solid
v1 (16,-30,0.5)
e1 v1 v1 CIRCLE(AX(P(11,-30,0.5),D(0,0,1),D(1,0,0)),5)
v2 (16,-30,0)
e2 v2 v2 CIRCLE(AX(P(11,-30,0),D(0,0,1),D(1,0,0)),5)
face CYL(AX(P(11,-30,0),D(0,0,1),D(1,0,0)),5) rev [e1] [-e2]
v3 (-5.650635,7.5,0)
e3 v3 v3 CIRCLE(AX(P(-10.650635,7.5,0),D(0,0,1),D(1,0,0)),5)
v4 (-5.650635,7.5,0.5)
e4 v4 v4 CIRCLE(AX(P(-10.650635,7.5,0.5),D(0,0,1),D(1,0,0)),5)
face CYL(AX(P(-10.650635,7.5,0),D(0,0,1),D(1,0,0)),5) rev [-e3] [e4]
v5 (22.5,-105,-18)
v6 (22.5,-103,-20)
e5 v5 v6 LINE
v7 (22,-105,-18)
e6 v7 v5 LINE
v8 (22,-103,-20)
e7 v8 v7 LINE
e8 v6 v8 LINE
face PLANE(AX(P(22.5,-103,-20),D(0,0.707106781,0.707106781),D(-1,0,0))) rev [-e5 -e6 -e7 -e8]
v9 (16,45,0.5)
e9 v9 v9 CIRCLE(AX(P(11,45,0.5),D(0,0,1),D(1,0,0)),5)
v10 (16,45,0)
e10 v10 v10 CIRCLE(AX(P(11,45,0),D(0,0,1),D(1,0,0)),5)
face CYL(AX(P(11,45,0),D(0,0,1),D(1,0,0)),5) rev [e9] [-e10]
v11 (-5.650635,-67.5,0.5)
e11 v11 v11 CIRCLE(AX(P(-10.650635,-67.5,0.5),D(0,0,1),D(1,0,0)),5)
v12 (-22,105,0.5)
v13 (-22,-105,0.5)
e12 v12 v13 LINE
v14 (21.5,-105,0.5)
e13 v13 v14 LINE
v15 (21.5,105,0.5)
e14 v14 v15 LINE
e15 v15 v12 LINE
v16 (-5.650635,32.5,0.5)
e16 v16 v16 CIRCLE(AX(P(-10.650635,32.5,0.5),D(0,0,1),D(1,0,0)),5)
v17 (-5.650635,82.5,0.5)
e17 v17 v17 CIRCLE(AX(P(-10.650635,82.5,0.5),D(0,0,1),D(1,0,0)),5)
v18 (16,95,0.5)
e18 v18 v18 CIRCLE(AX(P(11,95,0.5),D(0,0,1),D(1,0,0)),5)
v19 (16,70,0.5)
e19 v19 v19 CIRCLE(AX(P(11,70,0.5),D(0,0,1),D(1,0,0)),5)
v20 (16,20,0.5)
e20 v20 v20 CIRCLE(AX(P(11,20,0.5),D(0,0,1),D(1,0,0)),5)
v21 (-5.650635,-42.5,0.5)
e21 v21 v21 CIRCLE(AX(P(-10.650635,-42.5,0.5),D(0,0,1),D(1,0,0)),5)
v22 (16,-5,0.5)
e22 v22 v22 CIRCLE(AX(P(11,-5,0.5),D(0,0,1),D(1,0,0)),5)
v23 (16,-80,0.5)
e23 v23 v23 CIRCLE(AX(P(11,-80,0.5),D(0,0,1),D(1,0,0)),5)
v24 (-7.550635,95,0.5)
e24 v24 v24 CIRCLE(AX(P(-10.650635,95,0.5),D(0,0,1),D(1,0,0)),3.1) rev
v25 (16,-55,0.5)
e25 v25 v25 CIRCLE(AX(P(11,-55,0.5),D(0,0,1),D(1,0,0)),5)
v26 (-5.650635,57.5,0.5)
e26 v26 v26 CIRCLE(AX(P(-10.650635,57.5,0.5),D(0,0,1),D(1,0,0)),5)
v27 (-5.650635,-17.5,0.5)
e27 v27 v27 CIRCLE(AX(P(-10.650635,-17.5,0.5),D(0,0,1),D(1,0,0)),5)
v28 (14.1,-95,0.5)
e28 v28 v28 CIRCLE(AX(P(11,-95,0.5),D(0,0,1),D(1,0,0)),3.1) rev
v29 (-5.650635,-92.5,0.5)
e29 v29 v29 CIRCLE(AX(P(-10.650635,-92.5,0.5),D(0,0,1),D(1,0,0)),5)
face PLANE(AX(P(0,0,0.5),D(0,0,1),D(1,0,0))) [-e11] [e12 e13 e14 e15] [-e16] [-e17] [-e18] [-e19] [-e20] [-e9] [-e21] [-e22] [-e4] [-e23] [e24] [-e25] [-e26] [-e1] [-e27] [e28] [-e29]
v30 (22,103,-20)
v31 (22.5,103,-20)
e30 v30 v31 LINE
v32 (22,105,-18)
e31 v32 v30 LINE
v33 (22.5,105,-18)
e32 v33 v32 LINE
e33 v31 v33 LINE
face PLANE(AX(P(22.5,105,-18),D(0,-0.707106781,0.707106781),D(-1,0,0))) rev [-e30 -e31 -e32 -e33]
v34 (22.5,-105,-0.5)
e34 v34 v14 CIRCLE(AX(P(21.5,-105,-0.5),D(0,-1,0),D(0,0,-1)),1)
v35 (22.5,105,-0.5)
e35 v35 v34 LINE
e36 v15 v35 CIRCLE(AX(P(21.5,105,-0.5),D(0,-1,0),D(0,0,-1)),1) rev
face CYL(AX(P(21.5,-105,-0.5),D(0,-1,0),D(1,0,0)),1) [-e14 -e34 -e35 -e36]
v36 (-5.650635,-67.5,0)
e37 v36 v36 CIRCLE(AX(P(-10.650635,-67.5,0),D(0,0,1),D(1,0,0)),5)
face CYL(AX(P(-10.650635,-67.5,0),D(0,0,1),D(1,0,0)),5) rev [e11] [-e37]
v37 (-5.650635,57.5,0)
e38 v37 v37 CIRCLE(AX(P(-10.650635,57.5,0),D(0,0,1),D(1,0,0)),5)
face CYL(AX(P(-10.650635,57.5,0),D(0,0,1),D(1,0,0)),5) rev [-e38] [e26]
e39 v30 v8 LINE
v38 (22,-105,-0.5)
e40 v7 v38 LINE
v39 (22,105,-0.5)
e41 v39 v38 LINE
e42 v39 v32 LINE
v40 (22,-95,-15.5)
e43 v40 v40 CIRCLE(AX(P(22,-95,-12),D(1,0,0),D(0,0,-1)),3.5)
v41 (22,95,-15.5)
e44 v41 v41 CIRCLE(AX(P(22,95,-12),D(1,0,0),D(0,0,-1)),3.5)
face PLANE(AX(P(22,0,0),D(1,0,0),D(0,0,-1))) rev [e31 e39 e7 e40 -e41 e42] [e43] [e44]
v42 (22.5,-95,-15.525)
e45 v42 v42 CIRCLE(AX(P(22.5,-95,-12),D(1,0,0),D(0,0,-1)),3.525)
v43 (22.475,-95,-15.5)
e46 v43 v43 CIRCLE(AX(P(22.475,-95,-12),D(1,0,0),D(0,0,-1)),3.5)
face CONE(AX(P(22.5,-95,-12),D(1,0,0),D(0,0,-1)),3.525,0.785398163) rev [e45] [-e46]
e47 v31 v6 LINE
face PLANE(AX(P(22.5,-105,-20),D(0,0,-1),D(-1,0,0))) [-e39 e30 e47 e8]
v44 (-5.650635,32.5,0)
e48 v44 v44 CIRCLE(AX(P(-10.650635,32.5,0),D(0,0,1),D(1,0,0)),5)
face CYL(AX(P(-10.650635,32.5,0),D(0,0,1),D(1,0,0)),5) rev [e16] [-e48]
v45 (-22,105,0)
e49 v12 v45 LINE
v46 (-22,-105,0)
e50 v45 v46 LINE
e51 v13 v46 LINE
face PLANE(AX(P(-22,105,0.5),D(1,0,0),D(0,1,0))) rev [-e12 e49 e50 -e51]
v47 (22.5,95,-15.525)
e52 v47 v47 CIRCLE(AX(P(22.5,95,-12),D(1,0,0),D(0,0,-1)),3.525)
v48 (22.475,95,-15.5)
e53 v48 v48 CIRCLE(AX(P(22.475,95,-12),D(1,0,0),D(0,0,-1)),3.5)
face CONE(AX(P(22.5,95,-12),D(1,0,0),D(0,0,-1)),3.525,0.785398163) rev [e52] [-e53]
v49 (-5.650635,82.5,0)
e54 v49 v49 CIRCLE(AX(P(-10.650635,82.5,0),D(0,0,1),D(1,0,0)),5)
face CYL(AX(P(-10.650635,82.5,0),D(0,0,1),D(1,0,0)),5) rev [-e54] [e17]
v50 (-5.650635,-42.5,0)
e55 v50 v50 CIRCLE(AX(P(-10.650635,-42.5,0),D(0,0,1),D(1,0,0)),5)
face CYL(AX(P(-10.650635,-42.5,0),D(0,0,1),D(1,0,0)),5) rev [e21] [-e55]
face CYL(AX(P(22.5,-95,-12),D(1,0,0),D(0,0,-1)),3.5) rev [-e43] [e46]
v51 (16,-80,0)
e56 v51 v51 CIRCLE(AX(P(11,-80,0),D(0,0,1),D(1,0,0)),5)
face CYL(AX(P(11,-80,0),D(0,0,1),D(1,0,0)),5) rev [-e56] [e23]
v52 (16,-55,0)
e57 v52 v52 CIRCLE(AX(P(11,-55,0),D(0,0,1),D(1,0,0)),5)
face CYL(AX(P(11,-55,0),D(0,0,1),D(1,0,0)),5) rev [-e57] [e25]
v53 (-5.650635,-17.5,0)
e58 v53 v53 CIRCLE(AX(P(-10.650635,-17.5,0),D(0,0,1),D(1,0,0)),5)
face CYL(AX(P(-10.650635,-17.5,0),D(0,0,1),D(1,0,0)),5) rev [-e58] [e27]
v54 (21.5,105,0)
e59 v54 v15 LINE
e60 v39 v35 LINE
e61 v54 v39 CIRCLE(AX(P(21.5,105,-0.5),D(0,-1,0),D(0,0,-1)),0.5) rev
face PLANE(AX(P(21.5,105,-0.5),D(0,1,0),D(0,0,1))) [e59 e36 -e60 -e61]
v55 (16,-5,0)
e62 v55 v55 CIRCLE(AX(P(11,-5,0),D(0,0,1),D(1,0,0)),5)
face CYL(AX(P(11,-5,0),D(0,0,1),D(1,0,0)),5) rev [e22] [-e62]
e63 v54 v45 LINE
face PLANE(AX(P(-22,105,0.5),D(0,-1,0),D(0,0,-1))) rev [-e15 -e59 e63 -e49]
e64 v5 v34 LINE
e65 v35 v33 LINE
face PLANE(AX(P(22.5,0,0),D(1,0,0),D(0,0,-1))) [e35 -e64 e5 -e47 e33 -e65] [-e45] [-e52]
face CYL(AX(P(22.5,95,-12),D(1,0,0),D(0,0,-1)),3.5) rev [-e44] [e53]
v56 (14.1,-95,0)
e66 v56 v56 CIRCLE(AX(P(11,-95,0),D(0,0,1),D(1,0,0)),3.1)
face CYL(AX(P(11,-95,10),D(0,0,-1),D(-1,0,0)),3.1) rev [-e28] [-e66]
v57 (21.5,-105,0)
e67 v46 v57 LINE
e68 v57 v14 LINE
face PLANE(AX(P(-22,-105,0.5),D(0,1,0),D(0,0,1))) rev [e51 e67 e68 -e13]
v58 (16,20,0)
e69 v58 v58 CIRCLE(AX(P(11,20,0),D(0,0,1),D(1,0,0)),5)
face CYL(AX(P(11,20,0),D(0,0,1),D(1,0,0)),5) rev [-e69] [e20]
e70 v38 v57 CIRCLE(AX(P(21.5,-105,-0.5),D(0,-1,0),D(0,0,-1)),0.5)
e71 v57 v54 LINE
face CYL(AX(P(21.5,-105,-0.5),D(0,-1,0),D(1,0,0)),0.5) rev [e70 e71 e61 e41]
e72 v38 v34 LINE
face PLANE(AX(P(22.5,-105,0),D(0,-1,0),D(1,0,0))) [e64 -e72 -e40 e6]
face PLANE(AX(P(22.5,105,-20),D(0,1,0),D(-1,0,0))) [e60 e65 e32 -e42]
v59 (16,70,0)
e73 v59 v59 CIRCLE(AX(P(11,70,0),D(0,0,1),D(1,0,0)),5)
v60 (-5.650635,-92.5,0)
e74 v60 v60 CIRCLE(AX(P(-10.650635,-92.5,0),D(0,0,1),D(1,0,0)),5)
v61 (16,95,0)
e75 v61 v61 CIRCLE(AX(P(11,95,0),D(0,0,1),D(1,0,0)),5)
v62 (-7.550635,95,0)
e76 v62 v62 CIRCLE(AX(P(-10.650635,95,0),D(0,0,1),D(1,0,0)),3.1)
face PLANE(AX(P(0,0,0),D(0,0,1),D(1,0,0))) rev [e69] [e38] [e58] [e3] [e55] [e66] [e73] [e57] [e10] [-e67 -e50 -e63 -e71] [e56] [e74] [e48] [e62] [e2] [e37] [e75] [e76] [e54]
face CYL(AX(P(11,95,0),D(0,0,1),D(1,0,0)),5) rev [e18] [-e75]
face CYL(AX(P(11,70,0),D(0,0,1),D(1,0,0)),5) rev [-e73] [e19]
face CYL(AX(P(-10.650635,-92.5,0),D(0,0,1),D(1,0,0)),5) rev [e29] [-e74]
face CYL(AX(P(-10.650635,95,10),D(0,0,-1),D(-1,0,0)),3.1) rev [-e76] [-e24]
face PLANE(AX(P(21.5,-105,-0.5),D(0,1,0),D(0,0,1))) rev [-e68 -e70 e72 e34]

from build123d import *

# Parameters (mm, degrees)
SKETCH2_W                          = 44
SKETCH2_H                          = 210
BOSS_EXTRUDE1_DEPTH                = 0.5
SKETCH3_R                          = 5
CUT_EXTRUDE1_DEPTH                 = 108.281172626
LPATTERN1_COUNT                    = 8
LPATTERN1_PITCH                    = 25
EDGE_FLANGE1_STRIP_W               = 3
EDGE_FLANGE1_STRIP_H               = 0.5
EDGE_FLANGE1_STRIP_CUT_DEPTH       = 210
EDGE_FLANGE1_DEPTH                 = 210
F_7_0_7_DIAMETER_HOLE1_D           = 7
F_7_0_7_DIAMETER_HOLE1_DEPTH       = 60
F_7_0_7_DIAMETER_HOLE1_CSINK_D     = 7.05
F_7_0_7_DIAMETER_HOLE1_CSINK_ANGLE = 90
F_7_0_7_DIAMETER_HOLE1_TIP         = 2.103012167
BREAK_CORNER1_START                = 86.974134086
BREAK_CORNER1_OUTLINE_W            = 3
BREAK_CORNER1_OUTLINE_H            = 149.974134086
BREAK_CORNER1_DEPTH                = 1.414213562
BREAK_CORNER1_START_2              = -61.518289963
BREAK_CORNER1_2_OUTLINE_W          = 3
BREAK_CORNER1_2_OUTLINE_H          = 2.025865914
BREAK_CORNER1_2_DEPTH              = 2.828427125
SKETCH17_R                         = 3.1
CUT_EXTRUDE2_DEPTH                 = 10


# Read off the part's stored shape, not the designer's step: Break-Corner1
# Sheet-metal steps are written as plain solids
with BuildPart() as part:
    # Sketch2 → Boss-Extrude1 (new body)
    with BuildSketch(Plane.XY):
        Rectangle(SKETCH2_W, SKETCH2_H)
    extrude(amount=BOSS_EXTRUDE1_DEPTH)

    # Sketch3 → Cut-Extrude1 (cut, through all)
    with BuildSketch(Plane.XY.offset(0.5)):
        with Locations((11, 95)):
            Circle(SKETCH3_R)
        with Locations((-10.650635095, 82.5)):
            Circle(SKETCH3_R)
    cut_extrude1 = extrude(amount=-CUT_EXTRUDE1_DEPTH, mode=Mode.SUBTRACT)

    # LPattern1: Cut-Extrude1 ×8
    with Locations(*[(0, -i * LPATTERN1_PITCH, 0) for i in range(1, LPATTERN1_COUNT)]):
        add(cut_extrude1, mode=Mode.SUBTRACT)

    # Edge-Flange1 strip (across the edge) → Edge-Flange1 strip cut (cut)
    with BuildSketch(Plane(origin=(22, 105, 0), x_dir=(-1, 0, 0), z_dir=(0, -1, 0))):
        with Locations((-1, -0.25)):
            Rectangle(EDGE_FLANGE1_STRIP_W, EDGE_FLANGE1_STRIP_H)
    extrude(amount=EDGE_FLANGE1_STRIP_CUT_DEPTH, mode=Mode.SUBTRACT)

    # Edge-Flange1 section (across the edge) → Edge-Flange1 (add)
    with BuildSketch(Plane(origin=(22, 105, 0), x_dir=(-1, 0, 0), z_dir=(0, -1, 0))):
        with BuildLine():
            Line((-0.5, 0.5), (-0.5, 20))
            Line((-0.5, 20), (0, 20))
            Line((0, 20), (0, 0.5))
            ThreePointArc((0, 0.5), (0.146446609, 0.146446609), (0.5, 0))
            Line((0.5, 0), (0.5, -0.5))
            ThreePointArc((0.5, -0.5), (-0.207106781, -0.207106781), (-0.5, 0.5))
        make_face()
    extrude(amount=EDGE_FLANGE1_DEPTH)

    # Ø7.0 (7) Diameter Hole1
    with Locations(Plane(origin=(22.5, 0, 0), x_dir=(0, 0, -1), z_dir=(1, 0, 0))):
        with Locations((12, 95), (12, -95)):
            CounterSinkHole(F_7_0_7_DIAMETER_HOLE1_D / 2, F_7_0_7_DIAMETER_HOLE1_CSINK_D / 2, depth=F_7_0_7_DIAMETER_HOLE1_DEPTH, counter_sink_angle=F_7_0_7_DIAMETER_HOLE1_CSINK_ANGLE)
            with Locations((0, 0, -(F_7_0_7_DIAMETER_HOLE1_DEPTH + F_7_0_7_DIAMETER_HOLE1_TIP / 2))):  # 118° drill point
                Cone(0, F_7_0_7_DIAMETER_HOLE1_D / 2, F_7_0_7_DIAMETER_HOLE1_TIP, mode=Mode.SUBTRACT)

    # Break-Corner1 outline → Break-Corner1 (cut)
    with BuildSketch(Plane(origin=(0, 0, 0), x_dir=(1, 0, 0), z_dir=(0, 0.707106781186545, -0.70710678118655)).offset(BREAK_CORNER1_START)):
        with Locations((22.5, 11.987067043)):
            Rectangle(BREAK_CORNER1_OUTLINE_W, BREAK_CORNER1_OUTLINE_H)
    extrude(amount=BREAK_CORNER1_DEPTH, mode=Mode.SUBTRACT)

    # Break-Corner1 2 outline → Break-Corner1 2 (cut)
    with BuildSketch(Plane(origin=(0, 0, 0), x_dir=(1, 0, 0), z_dir=(0, 0.707106781186545, -0.70710678118655)).offset(BREAK_CORNER1_START_2)):
        with Locations((22.5, 87.987067043)):
            Rectangle(BREAK_CORNER1_2_OUTLINE_W, BREAK_CORNER1_2_OUTLINE_H)
    extrude(amount=BREAK_CORNER1_2_DEPTH, mode=Mode.SUBTRACT)

    # Sketch17 → Cut-Extrude2 (cut)
    with BuildSketch(Plane.XY):
        with Locations((-10.650635095, 95)):
            Circle(SKETCH17_R)
        with Locations((11, -95)):
            Circle(SKETCH17_R)
    extrude(amount=CUT_EXTRUDE2_DEPTH, mode=Mode.SUBTRACT)


solid = part.part
